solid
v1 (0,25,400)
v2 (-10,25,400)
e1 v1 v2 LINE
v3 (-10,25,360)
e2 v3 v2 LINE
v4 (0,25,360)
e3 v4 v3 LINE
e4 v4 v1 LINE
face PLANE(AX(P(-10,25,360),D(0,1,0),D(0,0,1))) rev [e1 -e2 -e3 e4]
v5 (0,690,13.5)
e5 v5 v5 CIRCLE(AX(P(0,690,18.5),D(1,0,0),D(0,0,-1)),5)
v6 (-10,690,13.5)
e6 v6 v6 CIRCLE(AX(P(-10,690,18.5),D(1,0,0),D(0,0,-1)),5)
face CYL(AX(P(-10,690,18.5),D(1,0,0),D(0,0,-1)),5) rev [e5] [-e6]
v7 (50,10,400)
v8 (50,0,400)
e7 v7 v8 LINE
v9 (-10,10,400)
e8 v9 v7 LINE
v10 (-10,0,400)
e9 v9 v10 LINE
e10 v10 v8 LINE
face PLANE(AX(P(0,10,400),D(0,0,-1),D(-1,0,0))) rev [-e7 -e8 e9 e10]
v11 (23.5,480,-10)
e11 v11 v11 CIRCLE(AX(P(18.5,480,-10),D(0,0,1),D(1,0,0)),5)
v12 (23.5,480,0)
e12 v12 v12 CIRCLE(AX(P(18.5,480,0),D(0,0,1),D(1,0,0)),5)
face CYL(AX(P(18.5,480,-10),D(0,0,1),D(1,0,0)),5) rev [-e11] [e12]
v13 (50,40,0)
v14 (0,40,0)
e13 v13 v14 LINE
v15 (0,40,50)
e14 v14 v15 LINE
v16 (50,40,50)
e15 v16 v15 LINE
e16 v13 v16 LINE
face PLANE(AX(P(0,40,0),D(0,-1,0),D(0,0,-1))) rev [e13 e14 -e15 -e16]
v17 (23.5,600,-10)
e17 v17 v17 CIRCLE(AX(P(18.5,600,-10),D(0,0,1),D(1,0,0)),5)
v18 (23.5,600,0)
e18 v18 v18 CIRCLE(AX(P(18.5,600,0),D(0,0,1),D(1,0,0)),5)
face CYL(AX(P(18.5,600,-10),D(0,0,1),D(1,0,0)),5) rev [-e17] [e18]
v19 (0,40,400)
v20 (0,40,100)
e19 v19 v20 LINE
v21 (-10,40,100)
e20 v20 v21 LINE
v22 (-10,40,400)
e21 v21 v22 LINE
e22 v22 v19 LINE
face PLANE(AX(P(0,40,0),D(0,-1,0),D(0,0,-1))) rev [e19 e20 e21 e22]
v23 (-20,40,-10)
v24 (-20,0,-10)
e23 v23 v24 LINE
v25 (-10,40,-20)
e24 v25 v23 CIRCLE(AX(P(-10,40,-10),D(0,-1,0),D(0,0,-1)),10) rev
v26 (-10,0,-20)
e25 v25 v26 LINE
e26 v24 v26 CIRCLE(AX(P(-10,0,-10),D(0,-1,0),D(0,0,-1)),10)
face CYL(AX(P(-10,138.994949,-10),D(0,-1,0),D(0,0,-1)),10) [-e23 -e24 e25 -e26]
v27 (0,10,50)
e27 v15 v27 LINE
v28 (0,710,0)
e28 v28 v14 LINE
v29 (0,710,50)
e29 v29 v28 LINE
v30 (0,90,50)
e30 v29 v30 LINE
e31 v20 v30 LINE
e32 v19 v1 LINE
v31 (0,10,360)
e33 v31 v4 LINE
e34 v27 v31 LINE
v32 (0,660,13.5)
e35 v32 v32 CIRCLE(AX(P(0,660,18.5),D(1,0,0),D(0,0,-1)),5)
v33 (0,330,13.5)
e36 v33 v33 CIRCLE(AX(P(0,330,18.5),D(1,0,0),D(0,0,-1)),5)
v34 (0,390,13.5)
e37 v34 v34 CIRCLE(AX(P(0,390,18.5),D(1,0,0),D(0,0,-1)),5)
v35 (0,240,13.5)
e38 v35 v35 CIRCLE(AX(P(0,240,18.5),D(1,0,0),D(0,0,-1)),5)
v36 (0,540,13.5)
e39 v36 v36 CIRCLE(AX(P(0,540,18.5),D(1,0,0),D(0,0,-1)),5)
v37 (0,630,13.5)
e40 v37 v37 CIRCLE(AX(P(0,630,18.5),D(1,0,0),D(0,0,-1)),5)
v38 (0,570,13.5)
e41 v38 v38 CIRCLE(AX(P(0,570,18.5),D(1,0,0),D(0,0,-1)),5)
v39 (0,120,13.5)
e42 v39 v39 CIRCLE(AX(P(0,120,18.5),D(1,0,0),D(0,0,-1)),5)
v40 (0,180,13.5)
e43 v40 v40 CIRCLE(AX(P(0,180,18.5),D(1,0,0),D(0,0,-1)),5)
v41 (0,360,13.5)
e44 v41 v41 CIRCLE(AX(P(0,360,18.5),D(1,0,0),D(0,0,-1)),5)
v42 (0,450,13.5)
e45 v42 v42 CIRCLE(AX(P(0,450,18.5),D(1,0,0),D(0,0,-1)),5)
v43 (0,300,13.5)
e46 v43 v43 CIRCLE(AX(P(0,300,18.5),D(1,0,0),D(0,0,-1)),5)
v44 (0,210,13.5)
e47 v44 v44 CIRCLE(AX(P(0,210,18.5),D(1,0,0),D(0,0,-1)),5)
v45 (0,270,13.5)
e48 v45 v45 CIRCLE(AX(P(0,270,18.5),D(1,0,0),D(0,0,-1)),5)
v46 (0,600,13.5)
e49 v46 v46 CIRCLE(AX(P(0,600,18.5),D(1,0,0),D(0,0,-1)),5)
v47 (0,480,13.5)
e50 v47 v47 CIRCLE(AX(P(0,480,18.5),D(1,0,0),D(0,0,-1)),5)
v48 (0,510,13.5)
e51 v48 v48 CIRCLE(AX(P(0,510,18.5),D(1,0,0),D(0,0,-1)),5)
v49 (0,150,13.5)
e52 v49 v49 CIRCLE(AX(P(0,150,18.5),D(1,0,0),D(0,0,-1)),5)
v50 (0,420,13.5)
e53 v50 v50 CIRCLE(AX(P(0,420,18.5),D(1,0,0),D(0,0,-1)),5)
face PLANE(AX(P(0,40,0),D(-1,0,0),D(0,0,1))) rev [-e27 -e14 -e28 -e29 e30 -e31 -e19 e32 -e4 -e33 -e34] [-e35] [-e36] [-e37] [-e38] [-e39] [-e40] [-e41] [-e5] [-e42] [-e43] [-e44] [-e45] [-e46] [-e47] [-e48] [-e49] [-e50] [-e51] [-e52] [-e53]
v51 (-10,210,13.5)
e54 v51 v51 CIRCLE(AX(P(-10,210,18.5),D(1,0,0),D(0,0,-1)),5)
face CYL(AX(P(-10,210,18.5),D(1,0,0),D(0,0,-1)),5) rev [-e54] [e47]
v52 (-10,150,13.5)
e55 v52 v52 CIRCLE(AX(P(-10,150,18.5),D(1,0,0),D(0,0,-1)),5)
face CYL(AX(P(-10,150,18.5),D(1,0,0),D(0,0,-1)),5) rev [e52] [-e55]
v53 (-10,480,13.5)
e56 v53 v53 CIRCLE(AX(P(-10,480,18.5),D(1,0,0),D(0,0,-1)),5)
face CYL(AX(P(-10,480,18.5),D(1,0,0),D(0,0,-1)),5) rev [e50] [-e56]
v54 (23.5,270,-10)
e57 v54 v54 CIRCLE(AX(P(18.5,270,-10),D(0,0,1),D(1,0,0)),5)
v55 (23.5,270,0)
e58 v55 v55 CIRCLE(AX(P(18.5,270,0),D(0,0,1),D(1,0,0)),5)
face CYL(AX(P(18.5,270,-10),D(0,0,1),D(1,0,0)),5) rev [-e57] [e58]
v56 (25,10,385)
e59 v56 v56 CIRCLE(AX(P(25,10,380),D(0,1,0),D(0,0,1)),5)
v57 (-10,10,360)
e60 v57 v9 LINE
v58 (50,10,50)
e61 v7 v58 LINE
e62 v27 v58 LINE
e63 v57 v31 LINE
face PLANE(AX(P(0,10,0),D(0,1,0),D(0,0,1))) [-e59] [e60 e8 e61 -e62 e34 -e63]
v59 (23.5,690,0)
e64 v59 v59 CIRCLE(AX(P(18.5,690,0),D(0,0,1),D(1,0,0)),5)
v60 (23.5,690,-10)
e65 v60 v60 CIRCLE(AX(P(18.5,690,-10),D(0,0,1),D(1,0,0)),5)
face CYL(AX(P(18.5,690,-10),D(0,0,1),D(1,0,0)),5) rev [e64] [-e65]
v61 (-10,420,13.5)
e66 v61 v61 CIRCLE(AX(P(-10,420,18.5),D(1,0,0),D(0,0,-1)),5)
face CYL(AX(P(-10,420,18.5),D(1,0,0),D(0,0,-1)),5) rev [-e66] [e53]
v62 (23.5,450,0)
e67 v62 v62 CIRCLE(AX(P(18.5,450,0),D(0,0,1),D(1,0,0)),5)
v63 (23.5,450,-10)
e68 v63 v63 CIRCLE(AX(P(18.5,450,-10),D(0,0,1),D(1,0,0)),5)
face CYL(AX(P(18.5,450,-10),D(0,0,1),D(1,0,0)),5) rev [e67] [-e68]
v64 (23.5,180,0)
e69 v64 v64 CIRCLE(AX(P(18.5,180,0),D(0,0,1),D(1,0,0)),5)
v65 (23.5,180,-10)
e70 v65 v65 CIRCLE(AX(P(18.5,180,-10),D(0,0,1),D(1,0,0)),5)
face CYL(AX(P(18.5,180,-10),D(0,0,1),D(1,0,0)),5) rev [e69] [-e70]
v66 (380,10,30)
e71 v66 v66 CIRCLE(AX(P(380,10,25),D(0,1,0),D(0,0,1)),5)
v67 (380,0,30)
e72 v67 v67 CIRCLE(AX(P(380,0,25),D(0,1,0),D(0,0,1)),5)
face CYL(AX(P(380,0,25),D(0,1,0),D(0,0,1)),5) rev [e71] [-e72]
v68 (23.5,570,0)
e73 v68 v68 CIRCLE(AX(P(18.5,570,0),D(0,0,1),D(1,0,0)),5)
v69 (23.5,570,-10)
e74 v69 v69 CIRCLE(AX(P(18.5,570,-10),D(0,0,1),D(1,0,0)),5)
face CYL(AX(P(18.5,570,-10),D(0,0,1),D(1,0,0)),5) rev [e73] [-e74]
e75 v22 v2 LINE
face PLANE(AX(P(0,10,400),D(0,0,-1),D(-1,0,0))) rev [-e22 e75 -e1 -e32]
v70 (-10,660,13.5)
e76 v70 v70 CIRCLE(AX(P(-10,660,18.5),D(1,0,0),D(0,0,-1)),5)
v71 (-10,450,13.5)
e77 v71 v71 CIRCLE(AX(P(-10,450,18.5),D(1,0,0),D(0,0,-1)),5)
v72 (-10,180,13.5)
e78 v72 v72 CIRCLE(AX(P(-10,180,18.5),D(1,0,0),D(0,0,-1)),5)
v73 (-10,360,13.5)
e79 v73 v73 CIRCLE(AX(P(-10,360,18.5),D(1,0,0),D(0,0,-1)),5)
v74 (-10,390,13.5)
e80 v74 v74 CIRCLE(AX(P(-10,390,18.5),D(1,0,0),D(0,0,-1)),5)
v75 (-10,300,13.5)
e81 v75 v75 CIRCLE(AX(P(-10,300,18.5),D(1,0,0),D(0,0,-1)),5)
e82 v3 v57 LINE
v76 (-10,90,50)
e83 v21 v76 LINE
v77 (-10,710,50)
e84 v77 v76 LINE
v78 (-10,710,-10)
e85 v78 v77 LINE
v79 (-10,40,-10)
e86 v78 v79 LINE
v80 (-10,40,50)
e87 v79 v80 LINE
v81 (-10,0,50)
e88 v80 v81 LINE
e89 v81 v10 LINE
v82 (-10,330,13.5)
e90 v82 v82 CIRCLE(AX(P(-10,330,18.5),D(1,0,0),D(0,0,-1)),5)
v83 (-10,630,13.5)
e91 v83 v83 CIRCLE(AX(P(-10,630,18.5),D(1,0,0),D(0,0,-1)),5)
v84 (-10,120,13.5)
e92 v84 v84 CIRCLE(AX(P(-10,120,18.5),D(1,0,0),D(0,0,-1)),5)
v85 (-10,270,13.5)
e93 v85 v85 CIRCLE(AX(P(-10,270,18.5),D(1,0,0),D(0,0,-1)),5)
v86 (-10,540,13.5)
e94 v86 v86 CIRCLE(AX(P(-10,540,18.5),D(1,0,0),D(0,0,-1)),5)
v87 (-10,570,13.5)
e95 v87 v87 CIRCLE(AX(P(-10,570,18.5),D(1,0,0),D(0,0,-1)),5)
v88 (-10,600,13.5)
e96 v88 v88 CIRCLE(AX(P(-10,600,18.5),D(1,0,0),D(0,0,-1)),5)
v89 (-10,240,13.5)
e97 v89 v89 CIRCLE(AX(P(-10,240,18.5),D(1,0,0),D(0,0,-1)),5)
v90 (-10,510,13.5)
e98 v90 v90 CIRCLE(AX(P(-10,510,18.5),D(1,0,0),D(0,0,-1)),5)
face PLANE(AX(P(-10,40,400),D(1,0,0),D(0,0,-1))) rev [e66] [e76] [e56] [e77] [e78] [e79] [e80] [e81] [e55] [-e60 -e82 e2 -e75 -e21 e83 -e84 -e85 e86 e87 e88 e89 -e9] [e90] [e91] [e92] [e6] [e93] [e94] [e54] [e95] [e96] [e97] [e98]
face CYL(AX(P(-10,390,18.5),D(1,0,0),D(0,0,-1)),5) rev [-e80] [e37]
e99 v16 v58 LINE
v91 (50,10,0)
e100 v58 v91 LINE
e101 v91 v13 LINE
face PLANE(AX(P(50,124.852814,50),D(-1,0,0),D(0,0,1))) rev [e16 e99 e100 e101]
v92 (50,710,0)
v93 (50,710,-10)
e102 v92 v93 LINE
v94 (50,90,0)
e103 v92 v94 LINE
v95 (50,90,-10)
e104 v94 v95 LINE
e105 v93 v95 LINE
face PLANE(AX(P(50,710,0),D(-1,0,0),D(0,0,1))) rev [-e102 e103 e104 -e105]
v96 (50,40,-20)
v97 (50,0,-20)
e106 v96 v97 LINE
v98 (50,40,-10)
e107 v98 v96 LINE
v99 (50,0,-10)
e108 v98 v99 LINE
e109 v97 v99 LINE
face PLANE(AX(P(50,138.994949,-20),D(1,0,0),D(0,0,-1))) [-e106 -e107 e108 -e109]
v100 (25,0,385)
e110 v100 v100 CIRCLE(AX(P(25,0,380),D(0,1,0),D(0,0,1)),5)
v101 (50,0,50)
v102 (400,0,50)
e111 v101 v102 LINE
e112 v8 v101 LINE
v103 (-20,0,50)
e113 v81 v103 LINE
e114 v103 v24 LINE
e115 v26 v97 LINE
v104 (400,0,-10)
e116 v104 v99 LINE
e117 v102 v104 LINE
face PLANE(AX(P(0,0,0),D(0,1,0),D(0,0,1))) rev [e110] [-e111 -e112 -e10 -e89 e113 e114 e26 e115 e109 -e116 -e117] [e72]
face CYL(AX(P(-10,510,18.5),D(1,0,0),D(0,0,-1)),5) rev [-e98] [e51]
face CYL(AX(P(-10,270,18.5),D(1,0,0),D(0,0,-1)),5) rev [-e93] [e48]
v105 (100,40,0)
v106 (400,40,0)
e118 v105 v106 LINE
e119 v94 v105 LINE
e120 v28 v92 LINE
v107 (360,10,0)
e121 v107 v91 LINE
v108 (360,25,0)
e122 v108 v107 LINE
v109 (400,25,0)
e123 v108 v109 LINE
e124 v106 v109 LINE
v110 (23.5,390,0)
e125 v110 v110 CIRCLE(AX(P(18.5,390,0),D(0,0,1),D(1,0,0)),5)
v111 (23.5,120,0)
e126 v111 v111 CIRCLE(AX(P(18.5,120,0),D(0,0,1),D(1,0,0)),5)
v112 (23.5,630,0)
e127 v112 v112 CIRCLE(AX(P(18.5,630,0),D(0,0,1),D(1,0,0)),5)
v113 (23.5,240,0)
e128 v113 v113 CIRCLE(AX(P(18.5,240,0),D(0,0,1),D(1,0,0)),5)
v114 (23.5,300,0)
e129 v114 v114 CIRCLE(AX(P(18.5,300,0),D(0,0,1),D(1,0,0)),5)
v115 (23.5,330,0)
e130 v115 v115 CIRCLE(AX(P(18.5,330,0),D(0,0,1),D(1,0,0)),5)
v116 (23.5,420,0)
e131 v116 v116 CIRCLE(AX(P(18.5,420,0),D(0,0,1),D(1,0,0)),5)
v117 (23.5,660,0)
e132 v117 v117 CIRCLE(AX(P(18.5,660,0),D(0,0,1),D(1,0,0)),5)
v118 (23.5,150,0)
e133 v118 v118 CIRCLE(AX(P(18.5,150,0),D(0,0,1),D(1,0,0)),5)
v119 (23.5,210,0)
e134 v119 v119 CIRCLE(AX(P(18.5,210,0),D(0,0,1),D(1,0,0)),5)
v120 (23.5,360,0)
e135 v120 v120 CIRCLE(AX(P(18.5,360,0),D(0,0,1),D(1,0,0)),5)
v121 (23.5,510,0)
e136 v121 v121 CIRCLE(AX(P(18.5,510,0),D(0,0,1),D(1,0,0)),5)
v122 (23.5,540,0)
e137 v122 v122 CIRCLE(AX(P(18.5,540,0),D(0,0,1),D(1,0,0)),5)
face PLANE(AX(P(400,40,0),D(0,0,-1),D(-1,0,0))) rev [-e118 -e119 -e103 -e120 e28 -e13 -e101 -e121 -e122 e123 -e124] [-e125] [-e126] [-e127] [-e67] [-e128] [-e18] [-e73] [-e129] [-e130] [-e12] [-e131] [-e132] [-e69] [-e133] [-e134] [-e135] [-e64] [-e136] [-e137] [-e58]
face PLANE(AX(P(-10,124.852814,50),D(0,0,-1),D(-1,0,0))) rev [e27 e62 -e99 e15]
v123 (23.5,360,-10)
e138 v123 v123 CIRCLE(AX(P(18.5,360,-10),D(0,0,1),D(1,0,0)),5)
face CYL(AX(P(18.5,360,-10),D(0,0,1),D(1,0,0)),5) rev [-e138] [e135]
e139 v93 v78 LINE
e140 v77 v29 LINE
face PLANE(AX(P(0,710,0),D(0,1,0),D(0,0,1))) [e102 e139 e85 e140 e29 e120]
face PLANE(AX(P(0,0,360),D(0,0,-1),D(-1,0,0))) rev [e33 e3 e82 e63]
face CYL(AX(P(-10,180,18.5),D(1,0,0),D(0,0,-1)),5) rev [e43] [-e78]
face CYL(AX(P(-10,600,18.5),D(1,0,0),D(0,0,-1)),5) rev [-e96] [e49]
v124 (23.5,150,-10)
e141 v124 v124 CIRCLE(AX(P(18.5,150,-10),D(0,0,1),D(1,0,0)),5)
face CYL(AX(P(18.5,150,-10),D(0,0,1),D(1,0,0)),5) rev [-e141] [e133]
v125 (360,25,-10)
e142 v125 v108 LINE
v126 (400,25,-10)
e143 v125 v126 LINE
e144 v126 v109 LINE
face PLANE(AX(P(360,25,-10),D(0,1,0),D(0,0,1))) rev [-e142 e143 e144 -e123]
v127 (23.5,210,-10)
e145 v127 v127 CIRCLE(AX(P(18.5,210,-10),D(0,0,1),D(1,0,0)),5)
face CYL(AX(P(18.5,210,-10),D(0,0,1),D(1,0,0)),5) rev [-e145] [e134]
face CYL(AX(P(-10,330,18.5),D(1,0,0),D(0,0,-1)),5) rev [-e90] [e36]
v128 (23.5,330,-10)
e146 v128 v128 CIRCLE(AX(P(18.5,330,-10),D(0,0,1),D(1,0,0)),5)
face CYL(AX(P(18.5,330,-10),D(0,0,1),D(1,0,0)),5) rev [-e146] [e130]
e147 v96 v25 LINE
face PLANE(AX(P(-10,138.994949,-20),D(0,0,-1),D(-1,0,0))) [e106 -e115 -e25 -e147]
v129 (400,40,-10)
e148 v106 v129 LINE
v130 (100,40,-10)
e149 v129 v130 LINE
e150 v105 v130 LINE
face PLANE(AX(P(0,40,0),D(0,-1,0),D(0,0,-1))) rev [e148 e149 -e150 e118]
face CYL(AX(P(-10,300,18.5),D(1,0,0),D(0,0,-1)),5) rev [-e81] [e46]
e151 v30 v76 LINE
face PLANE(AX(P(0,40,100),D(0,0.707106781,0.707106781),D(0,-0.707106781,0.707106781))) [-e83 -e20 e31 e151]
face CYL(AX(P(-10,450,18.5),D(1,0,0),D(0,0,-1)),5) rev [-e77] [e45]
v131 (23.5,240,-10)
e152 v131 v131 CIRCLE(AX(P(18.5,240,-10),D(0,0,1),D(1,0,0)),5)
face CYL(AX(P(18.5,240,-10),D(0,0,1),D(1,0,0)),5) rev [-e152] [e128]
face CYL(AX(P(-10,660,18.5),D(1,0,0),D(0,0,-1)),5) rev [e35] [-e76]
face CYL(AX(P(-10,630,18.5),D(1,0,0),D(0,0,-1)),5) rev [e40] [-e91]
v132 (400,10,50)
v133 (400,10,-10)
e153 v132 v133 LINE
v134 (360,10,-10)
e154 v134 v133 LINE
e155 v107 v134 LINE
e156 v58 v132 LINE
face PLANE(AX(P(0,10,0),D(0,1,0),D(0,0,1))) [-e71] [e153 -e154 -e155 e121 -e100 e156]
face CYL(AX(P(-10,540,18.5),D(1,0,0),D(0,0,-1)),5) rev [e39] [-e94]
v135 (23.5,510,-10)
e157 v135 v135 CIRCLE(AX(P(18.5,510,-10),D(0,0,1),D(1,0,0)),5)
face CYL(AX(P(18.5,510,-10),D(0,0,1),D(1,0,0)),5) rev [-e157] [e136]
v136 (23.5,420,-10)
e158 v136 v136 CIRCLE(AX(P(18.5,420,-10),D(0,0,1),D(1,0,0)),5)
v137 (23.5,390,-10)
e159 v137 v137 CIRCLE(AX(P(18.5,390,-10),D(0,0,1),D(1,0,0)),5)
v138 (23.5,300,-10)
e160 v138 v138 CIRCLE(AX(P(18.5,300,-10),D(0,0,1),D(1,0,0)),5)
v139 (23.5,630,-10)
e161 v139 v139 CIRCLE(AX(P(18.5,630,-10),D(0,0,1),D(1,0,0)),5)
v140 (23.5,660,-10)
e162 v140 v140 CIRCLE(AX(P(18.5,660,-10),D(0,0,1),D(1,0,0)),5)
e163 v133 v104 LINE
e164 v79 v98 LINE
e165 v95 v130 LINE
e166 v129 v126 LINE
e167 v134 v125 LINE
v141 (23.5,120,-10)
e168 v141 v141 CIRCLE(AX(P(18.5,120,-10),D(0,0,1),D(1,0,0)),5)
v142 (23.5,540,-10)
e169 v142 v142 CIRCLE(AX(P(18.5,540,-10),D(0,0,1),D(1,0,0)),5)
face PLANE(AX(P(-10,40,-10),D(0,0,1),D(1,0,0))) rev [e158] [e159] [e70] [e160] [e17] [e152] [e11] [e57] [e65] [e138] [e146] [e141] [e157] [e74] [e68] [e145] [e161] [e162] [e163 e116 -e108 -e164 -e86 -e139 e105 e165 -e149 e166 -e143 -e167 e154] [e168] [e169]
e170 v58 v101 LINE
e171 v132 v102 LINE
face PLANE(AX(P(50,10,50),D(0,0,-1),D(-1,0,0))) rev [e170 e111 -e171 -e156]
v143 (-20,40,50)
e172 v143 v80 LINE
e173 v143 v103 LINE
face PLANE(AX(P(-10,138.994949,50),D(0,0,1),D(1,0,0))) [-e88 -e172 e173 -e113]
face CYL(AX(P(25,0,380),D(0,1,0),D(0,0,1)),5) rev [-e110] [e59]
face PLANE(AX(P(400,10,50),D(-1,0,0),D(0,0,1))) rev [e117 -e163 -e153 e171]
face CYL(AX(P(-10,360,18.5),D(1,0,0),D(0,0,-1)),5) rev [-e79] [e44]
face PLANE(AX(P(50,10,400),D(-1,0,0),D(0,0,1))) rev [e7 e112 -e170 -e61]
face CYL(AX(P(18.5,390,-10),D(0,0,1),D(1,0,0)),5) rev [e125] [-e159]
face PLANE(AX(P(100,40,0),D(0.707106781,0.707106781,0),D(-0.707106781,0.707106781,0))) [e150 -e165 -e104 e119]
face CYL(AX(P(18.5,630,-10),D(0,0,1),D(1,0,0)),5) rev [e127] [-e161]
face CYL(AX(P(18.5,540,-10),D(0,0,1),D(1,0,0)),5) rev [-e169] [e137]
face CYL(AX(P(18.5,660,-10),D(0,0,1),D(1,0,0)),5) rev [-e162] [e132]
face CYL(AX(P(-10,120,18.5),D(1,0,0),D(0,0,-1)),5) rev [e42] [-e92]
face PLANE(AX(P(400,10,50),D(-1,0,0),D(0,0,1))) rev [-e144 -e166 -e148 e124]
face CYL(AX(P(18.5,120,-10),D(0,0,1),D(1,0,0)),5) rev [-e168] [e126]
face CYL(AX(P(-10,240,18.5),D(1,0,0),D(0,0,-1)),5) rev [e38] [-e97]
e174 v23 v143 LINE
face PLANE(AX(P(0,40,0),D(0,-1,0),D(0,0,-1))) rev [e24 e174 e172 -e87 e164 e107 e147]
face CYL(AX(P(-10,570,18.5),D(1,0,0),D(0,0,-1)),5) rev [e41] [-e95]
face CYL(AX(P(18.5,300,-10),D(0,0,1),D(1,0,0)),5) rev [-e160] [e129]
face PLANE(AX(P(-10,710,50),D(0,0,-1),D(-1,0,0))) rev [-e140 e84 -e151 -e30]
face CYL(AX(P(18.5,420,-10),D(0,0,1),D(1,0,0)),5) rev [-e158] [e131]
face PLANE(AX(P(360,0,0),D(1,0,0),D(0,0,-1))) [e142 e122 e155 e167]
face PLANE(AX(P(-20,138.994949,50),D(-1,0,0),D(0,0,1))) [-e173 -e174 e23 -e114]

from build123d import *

# Parameters (mm, degrees)
EXTRUDE_2_DEPTH          = 10
EXTRUDE_3_DEPTH          = 40
EXTRUDE_4_DEPTH          = 700
SKETCH_13_W              = 60
SKETCH_13_H              = 60
EXTRUDE_7_DEPTH          = 30
EXTRUDE_1_DEPTH          = 40
EXTRUDE_8_DEPTH          = 10
EXTRUDE_9_DEPTH          = 10
SKETCH_36_R              = 5
CUT_EXTRUDE_1_DEPTH      = 10
PATTERN_LINEAR_1_COUNT   = 20
PATTERN_LINEAR_1_PITCH   = 30
SKETCH_37_R              = 5
CUT_EXTRUDE_2_DEPTH      = 10
PATTERN_LINEAR_2_COUNT   = 20
PATTERN_LINEAR_2_PITCH   = 30
CUT_EXTRUDE_3_DEPTH      = 901
CUT_EXTRUDE_3_DEPTH_BACK = 901
SKETCH_38_R              = 5
SKETCH_39_W              = 10
SKETCH_39_H              = 15
CUT_EXTRUDE_4_DEPTH      = 40
SKETCH_40_W              = 10
SKETCH_40_H              = 15
CUT_EXTRUDE_5_DEPTH      = 40


# Read off the part's stored shape, not the designer's step: 拉伸-薄壁1
with BuildPart() as part:
    # 草图3 → 凸台-拉伸2 (new body)
    with BuildSketch(Plane(origin=(0, 0, 0), x_dir=(1, 0, 0), z_dir=(0, 1, 0))):
        Polygon((0, 0), (0, -400), (50, -400), (50, -50), (400, -50), (400, 0), align=None)
    extrude(amount=EXTRUDE_2_DEPTH)

    # 草图4 → 凸台-拉伸3 (add)
    with BuildSketch(Plane(origin=(0, 0, 0), x_dir=(1, 0, 0), z_dir=(0, 1, 0))):
        Polygon((0, -400), (-10, -400), (-10, 10), (400, 10), (400, 0), (0, 0), align=None)
    extrude(amount=EXTRUDE_3_DEPTH)

    # 草图6 → 凸台-拉伸4 (add)
    with BuildSketch(Plane(origin=(0, 10, 0), x_dir=(1, 0, 0), z_dir=(0, 1, 0))):
        Polygon((-10, 10), (-10, -50), (0, -50), (0, 0), (50, 0), (50, 10), align=None)
    extrude(amount=EXTRUDE_4_DEPTH)

    # 草图13 → 凸台-拉伸7 (add)
    with BuildSketch(Plane(origin=(0, 10, 0), x_dir=(1, 0, 0), z_dir=(0, 1, 0))):
        with Locations((20, -20)):
            Rectangle(SKETCH_13_W, SKETCH_13_H)
    extrude(amount=EXTRUDE_7_DEPTH)

    # 拉伸-薄壁1 outline → 拉伸-薄壁1 (add)
    with BuildSketch(Plane(origin=(0, 0, 0), x_dir=(1, 0, 0), z_dir=(0, 1, 0))):
        with BuildLine():
            Line((-10, 10), (50, 10))
            Line((50, 10), (50, 20))
            Line((50, 20), (-10, 20))
            ThreePointArc((-10, 20), (-17.071067812, 17.071067812), (-20, 10))
            Line((-20, 10), (-20, -50))
            Line((-20, -50), (-10, -50))
            Line((-10, -50), (-10, 10))
        make_face()
    extrude(amount=EXTRUDE_1_DEPTH)

    # 草图34 → 凸台-拉伸8 (add)
    with BuildSketch(Plane(origin=(0, 0, -10), x_dir=(-1, 0, 0), z_dir=(0, 0, -1))):
        Polygon((-100, 40), (-50, 90), (-50, 40), align=None)
    extrude(amount=-EXTRUDE_8_DEPTH)

    # 草图35 → 凸台-拉伸9 (add)
    with BuildSketch(Plane.ZY.offset(10)):
        Polygon((50, 90), (50, 40), (100, 40), align=None)
    extrude(amount=-EXTRUDE_9_DEPTH)

    # 草图36 → 切除-拉伸1 (cut)
    with BuildSketch(Plane(origin=(0, 0, 0), x_dir=(0, 0, -1), z_dir=(1, 0, 0))):
        with Locations((-18.5, 690)):
            Circle(SKETCH_36_R)
    cut_extrude_1 = extrude(amount=-CUT_EXTRUDE_1_DEPTH, mode=Mode.SUBTRACT)

    # 阵列(线性)1: 切除-拉伸1 ×20
    with Locations(*[(0, -i * PATTERN_LINEAR_1_PITCH, 0) for i in range(1, PATTERN_LINEAR_1_COUNT)]):
        add(cut_extrude_1, mode=Mode.SUBTRACT)

    # 草图37 → 切除-拉伸2 (cut)
    with BuildSketch(Plane.XY):
        with Locations((18.5, 690)):
            Circle(SKETCH_37_R)
    cut_extrude_2 = extrude(amount=-CUT_EXTRUDE_2_DEPTH, mode=Mode.SUBTRACT)

    # 阵列(线性)2: 切除-拉伸2 ×20
    with Locations(*[(0, -i * PATTERN_LINEAR_2_PITCH, 0) for i in range(1, PATTERN_LINEAR_2_COUNT)]):
        add(cut_extrude_2, mode=Mode.SUBTRACT)

    # 草图38 → 切除-拉伸3 (cut, two sides: drawn at the far end of the back side and taken through both)
    with BuildSketch(Plane(origin=(0, 10, 0), x_dir=(1, 0, 0), z_dir=(0, 1, 0)).offset(-CUT_EXTRUDE_3_DEPTH_BACK)):
        with Locations(Location((25, -380, 0), (0, 0, 270))):
            Circle(SKETCH_38_R)
        with Locations(Location((380, -25, 0), (0, 0, 270))):
            Circle(SKETCH_38_R)
    extrude(amount=CUT_EXTRUDE_3_DEPTH + CUT_EXTRUDE_3_DEPTH_BACK, mode=Mode.SUBTRACT)

    # 草图39 → 切除-拉伸4 (cut)
    with BuildSketch(Plane.XY.offset(400)):
        with Locations((-5, 17.5)):
            Rectangle(SKETCH_39_W, SKETCH_39_H)
    extrude(amount=-CUT_EXTRUDE_4_DEPTH, mode=Mode.SUBTRACT)

    # 草图40 → 切除-拉伸5 (cut)
    with BuildSketch(Plane(origin=(400, 0, 0), x_dir=(0, 0, -1), z_dir=(1, 0, 0))):
        with Locations((5, 17.5)):
            Rectangle(SKETCH_40_W, SKETCH_40_H)
    extrude(amount=-CUT_EXTRUDE_5_DEPTH, mode=Mode.SUBTRACT)


solid = part.part
